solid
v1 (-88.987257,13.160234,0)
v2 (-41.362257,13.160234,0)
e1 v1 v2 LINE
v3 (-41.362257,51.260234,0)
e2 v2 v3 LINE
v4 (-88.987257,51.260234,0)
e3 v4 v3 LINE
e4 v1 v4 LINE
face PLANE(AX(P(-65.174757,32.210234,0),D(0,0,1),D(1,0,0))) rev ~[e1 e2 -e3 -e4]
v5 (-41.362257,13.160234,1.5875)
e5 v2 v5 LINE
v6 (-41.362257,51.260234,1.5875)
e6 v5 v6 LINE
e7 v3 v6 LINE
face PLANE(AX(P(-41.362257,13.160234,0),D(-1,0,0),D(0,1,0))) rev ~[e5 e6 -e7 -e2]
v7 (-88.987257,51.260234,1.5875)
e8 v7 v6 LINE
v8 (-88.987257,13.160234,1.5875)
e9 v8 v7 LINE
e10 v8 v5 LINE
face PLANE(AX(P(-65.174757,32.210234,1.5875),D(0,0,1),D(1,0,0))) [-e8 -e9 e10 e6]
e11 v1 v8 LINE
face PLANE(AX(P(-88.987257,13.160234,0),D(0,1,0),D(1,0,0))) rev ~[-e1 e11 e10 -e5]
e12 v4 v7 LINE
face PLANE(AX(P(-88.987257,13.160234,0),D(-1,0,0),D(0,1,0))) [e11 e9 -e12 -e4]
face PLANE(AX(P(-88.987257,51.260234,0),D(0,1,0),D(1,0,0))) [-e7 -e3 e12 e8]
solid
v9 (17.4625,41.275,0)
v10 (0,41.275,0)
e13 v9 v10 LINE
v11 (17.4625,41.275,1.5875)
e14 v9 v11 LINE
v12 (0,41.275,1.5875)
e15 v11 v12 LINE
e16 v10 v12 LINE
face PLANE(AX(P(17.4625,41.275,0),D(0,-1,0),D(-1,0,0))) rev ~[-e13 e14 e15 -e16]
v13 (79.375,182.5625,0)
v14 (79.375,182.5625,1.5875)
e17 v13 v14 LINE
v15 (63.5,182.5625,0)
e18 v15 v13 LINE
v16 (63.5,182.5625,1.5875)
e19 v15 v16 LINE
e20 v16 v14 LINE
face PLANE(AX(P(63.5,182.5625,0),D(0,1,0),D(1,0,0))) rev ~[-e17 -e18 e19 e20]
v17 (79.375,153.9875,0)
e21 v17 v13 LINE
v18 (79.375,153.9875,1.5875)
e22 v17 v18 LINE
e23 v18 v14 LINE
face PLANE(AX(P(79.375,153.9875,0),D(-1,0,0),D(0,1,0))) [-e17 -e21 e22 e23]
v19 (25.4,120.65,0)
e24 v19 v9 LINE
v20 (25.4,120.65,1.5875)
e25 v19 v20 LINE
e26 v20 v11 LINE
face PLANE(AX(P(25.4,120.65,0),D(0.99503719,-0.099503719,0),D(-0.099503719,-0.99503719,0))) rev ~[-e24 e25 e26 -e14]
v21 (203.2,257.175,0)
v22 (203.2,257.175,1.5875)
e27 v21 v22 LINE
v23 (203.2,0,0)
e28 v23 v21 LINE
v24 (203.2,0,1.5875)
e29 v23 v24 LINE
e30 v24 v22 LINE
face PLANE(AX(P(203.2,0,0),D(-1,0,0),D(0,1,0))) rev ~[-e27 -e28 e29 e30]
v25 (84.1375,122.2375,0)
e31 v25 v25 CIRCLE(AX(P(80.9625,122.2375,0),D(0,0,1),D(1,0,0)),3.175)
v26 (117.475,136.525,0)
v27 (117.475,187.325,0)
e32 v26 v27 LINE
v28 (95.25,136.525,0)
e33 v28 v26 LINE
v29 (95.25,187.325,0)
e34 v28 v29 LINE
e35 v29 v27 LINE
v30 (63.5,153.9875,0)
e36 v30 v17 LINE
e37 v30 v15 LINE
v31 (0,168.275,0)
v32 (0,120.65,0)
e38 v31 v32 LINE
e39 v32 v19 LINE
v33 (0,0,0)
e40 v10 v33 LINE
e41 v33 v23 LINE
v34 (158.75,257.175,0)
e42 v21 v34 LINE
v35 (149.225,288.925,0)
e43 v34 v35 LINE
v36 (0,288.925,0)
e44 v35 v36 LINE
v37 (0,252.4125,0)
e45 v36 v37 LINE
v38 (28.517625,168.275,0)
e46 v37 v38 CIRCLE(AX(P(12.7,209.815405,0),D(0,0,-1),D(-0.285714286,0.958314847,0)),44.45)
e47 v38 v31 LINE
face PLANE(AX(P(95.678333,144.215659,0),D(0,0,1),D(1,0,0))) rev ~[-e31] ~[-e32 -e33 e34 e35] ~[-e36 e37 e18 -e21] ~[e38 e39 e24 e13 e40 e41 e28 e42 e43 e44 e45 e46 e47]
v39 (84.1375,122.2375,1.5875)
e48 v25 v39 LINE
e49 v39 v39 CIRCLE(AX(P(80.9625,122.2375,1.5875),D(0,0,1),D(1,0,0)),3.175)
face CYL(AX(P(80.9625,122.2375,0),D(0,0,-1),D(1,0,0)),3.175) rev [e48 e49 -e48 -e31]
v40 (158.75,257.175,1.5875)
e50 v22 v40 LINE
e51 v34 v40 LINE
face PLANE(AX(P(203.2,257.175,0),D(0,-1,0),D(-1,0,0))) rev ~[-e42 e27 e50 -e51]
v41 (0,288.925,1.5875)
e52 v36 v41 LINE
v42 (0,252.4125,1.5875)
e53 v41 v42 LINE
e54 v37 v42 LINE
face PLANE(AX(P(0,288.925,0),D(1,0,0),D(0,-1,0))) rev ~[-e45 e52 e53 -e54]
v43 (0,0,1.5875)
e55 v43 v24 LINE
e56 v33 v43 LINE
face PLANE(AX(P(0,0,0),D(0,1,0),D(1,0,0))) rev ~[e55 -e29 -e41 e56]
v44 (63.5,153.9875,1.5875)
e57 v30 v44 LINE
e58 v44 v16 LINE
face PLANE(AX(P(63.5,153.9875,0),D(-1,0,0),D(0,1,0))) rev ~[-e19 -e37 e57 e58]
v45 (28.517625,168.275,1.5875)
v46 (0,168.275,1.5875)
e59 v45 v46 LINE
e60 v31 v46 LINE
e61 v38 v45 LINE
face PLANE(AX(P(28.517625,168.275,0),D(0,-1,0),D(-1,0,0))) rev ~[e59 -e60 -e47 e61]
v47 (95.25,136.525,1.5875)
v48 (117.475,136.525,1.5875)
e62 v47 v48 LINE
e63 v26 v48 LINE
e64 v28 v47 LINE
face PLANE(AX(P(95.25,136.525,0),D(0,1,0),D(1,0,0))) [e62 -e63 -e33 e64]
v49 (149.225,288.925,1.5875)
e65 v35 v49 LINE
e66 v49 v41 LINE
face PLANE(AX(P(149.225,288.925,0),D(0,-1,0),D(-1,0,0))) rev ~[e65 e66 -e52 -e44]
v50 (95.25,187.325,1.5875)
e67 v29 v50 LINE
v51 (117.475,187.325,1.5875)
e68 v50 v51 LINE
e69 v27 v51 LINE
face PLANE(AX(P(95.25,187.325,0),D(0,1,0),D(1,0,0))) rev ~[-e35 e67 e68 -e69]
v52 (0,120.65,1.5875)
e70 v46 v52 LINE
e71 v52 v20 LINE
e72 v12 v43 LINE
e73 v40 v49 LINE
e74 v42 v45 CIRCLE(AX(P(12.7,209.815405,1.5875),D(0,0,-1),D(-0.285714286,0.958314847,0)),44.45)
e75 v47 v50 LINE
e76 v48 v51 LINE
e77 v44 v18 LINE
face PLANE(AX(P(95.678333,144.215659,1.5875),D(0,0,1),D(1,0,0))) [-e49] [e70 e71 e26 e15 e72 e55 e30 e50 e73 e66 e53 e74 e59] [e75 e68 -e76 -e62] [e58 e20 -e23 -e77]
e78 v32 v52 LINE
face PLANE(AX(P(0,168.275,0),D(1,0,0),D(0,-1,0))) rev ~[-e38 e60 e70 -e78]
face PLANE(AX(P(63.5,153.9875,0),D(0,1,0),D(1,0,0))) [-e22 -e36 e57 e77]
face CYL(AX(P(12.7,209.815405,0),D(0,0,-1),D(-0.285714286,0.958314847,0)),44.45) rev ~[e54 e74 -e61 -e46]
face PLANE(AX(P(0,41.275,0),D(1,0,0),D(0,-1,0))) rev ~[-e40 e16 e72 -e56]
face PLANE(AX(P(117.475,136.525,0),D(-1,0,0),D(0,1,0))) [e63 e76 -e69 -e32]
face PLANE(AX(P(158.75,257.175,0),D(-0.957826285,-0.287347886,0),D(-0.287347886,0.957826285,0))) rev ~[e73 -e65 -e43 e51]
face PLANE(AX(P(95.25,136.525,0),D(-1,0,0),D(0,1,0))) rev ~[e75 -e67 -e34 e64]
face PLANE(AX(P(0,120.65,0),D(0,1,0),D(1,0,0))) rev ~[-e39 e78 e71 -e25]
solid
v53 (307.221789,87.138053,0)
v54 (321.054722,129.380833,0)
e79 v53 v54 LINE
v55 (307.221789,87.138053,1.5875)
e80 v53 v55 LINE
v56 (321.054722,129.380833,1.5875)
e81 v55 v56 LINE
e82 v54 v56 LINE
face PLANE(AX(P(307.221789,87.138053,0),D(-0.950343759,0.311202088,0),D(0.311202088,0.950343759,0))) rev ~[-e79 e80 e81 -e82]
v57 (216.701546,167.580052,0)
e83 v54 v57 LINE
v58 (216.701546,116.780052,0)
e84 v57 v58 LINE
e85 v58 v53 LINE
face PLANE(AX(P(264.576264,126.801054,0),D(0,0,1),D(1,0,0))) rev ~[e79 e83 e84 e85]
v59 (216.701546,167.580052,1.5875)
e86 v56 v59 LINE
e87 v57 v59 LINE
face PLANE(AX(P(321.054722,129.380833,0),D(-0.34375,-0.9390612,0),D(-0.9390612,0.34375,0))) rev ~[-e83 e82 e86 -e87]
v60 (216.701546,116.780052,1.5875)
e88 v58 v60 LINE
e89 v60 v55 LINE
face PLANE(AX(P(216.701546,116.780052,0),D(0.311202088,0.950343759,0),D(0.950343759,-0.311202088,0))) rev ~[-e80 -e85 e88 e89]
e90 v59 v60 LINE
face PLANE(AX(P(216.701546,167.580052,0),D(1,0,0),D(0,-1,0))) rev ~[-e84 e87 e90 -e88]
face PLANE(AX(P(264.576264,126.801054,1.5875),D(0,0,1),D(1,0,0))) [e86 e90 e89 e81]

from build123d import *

# Parameters (mm, degrees)
F0_R     = 3.175
F0_W     = 22.225
F0_H     = 50.8
F0_W_2   = 15.875
F0_H_2   = 28.575
F1_DEPTH = 1.5875
F2_DEPTH = 1.5875
F0_W_3   = 47.625
F0_H_3   = 38.1
F3_DEPTH = 1.5875


# Not quite as in the source:
# - a length typed as a fraction of an inch, garbled in the dataset ("3 / 203.2 mm" for 3/8 in), is restored


with BuildPart() as f1:
    # F0 (on Top) → F1 (new body)
    with BuildSketch(Plane.XY):
        with BuildLine():
            Line((0, 0), (203.2, 0))
            Line((203.2, 0), (203.2, 257.175))
            Line((203.2, 257.175), (158.75, 257.175))
            Line((158.75, 257.175), (149.225, 288.925))
            Line((149.225, 288.925), (0, 288.925))
            Line((0, 288.925), (0, 252.4125))
            ThreePointArc((0, 252.4125), (54.7976201519, 224.0840026314), (28.5176246655, 168.275))
            Line((28.5176246655, 168.275), (0, 168.275))
            Line((0, 168.275), (0, 120.65))
            Line((0, 120.65), (25.4, 120.65))
            Line((25.4, 120.65), (17.4625, 41.275))
            Line((17.4625, 41.275), (0, 41.275))
            Line((0, 41.275), (0, 0))
        make_face()
        with Locations((80.9625, 122.2375)):
            Circle(F0_R, mode=Mode.SUBTRACT)
        with Locations((106.3625, 161.925)):
            Rectangle(F0_W, F0_H, mode=Mode.SUBTRACT)
        with Locations((71.4375, 168.275)):
            Rectangle(F0_W_2, F0_H_2, mode=Mode.SUBTRACT)
    extrude(amount=F1_DEPTH)


with BuildPart() as f2:
    # F0 (on Top) → F2 (new body)
    with BuildSketch(Plane.XY):
        Polygon((321.0547220741, 129.3808330162), (216.7015462149, 167.5800517662), (216.7015462149, 116.7800517662), (307.221789279, 87.1380529197), align=None)
    extrude(amount=F2_DEPTH)


with BuildPart() as f3:
    # F0 (on Top) → F3 (new body)
    with BuildSketch(Plane.XY):
        with Locations((-65.1747573316, 32.2102343172)):
            Rectangle(F0_W_3, F0_H_3)
    extrude(amount=F3_DEPTH)


solid = Compound([f1.part, f2.part, f3.part])
